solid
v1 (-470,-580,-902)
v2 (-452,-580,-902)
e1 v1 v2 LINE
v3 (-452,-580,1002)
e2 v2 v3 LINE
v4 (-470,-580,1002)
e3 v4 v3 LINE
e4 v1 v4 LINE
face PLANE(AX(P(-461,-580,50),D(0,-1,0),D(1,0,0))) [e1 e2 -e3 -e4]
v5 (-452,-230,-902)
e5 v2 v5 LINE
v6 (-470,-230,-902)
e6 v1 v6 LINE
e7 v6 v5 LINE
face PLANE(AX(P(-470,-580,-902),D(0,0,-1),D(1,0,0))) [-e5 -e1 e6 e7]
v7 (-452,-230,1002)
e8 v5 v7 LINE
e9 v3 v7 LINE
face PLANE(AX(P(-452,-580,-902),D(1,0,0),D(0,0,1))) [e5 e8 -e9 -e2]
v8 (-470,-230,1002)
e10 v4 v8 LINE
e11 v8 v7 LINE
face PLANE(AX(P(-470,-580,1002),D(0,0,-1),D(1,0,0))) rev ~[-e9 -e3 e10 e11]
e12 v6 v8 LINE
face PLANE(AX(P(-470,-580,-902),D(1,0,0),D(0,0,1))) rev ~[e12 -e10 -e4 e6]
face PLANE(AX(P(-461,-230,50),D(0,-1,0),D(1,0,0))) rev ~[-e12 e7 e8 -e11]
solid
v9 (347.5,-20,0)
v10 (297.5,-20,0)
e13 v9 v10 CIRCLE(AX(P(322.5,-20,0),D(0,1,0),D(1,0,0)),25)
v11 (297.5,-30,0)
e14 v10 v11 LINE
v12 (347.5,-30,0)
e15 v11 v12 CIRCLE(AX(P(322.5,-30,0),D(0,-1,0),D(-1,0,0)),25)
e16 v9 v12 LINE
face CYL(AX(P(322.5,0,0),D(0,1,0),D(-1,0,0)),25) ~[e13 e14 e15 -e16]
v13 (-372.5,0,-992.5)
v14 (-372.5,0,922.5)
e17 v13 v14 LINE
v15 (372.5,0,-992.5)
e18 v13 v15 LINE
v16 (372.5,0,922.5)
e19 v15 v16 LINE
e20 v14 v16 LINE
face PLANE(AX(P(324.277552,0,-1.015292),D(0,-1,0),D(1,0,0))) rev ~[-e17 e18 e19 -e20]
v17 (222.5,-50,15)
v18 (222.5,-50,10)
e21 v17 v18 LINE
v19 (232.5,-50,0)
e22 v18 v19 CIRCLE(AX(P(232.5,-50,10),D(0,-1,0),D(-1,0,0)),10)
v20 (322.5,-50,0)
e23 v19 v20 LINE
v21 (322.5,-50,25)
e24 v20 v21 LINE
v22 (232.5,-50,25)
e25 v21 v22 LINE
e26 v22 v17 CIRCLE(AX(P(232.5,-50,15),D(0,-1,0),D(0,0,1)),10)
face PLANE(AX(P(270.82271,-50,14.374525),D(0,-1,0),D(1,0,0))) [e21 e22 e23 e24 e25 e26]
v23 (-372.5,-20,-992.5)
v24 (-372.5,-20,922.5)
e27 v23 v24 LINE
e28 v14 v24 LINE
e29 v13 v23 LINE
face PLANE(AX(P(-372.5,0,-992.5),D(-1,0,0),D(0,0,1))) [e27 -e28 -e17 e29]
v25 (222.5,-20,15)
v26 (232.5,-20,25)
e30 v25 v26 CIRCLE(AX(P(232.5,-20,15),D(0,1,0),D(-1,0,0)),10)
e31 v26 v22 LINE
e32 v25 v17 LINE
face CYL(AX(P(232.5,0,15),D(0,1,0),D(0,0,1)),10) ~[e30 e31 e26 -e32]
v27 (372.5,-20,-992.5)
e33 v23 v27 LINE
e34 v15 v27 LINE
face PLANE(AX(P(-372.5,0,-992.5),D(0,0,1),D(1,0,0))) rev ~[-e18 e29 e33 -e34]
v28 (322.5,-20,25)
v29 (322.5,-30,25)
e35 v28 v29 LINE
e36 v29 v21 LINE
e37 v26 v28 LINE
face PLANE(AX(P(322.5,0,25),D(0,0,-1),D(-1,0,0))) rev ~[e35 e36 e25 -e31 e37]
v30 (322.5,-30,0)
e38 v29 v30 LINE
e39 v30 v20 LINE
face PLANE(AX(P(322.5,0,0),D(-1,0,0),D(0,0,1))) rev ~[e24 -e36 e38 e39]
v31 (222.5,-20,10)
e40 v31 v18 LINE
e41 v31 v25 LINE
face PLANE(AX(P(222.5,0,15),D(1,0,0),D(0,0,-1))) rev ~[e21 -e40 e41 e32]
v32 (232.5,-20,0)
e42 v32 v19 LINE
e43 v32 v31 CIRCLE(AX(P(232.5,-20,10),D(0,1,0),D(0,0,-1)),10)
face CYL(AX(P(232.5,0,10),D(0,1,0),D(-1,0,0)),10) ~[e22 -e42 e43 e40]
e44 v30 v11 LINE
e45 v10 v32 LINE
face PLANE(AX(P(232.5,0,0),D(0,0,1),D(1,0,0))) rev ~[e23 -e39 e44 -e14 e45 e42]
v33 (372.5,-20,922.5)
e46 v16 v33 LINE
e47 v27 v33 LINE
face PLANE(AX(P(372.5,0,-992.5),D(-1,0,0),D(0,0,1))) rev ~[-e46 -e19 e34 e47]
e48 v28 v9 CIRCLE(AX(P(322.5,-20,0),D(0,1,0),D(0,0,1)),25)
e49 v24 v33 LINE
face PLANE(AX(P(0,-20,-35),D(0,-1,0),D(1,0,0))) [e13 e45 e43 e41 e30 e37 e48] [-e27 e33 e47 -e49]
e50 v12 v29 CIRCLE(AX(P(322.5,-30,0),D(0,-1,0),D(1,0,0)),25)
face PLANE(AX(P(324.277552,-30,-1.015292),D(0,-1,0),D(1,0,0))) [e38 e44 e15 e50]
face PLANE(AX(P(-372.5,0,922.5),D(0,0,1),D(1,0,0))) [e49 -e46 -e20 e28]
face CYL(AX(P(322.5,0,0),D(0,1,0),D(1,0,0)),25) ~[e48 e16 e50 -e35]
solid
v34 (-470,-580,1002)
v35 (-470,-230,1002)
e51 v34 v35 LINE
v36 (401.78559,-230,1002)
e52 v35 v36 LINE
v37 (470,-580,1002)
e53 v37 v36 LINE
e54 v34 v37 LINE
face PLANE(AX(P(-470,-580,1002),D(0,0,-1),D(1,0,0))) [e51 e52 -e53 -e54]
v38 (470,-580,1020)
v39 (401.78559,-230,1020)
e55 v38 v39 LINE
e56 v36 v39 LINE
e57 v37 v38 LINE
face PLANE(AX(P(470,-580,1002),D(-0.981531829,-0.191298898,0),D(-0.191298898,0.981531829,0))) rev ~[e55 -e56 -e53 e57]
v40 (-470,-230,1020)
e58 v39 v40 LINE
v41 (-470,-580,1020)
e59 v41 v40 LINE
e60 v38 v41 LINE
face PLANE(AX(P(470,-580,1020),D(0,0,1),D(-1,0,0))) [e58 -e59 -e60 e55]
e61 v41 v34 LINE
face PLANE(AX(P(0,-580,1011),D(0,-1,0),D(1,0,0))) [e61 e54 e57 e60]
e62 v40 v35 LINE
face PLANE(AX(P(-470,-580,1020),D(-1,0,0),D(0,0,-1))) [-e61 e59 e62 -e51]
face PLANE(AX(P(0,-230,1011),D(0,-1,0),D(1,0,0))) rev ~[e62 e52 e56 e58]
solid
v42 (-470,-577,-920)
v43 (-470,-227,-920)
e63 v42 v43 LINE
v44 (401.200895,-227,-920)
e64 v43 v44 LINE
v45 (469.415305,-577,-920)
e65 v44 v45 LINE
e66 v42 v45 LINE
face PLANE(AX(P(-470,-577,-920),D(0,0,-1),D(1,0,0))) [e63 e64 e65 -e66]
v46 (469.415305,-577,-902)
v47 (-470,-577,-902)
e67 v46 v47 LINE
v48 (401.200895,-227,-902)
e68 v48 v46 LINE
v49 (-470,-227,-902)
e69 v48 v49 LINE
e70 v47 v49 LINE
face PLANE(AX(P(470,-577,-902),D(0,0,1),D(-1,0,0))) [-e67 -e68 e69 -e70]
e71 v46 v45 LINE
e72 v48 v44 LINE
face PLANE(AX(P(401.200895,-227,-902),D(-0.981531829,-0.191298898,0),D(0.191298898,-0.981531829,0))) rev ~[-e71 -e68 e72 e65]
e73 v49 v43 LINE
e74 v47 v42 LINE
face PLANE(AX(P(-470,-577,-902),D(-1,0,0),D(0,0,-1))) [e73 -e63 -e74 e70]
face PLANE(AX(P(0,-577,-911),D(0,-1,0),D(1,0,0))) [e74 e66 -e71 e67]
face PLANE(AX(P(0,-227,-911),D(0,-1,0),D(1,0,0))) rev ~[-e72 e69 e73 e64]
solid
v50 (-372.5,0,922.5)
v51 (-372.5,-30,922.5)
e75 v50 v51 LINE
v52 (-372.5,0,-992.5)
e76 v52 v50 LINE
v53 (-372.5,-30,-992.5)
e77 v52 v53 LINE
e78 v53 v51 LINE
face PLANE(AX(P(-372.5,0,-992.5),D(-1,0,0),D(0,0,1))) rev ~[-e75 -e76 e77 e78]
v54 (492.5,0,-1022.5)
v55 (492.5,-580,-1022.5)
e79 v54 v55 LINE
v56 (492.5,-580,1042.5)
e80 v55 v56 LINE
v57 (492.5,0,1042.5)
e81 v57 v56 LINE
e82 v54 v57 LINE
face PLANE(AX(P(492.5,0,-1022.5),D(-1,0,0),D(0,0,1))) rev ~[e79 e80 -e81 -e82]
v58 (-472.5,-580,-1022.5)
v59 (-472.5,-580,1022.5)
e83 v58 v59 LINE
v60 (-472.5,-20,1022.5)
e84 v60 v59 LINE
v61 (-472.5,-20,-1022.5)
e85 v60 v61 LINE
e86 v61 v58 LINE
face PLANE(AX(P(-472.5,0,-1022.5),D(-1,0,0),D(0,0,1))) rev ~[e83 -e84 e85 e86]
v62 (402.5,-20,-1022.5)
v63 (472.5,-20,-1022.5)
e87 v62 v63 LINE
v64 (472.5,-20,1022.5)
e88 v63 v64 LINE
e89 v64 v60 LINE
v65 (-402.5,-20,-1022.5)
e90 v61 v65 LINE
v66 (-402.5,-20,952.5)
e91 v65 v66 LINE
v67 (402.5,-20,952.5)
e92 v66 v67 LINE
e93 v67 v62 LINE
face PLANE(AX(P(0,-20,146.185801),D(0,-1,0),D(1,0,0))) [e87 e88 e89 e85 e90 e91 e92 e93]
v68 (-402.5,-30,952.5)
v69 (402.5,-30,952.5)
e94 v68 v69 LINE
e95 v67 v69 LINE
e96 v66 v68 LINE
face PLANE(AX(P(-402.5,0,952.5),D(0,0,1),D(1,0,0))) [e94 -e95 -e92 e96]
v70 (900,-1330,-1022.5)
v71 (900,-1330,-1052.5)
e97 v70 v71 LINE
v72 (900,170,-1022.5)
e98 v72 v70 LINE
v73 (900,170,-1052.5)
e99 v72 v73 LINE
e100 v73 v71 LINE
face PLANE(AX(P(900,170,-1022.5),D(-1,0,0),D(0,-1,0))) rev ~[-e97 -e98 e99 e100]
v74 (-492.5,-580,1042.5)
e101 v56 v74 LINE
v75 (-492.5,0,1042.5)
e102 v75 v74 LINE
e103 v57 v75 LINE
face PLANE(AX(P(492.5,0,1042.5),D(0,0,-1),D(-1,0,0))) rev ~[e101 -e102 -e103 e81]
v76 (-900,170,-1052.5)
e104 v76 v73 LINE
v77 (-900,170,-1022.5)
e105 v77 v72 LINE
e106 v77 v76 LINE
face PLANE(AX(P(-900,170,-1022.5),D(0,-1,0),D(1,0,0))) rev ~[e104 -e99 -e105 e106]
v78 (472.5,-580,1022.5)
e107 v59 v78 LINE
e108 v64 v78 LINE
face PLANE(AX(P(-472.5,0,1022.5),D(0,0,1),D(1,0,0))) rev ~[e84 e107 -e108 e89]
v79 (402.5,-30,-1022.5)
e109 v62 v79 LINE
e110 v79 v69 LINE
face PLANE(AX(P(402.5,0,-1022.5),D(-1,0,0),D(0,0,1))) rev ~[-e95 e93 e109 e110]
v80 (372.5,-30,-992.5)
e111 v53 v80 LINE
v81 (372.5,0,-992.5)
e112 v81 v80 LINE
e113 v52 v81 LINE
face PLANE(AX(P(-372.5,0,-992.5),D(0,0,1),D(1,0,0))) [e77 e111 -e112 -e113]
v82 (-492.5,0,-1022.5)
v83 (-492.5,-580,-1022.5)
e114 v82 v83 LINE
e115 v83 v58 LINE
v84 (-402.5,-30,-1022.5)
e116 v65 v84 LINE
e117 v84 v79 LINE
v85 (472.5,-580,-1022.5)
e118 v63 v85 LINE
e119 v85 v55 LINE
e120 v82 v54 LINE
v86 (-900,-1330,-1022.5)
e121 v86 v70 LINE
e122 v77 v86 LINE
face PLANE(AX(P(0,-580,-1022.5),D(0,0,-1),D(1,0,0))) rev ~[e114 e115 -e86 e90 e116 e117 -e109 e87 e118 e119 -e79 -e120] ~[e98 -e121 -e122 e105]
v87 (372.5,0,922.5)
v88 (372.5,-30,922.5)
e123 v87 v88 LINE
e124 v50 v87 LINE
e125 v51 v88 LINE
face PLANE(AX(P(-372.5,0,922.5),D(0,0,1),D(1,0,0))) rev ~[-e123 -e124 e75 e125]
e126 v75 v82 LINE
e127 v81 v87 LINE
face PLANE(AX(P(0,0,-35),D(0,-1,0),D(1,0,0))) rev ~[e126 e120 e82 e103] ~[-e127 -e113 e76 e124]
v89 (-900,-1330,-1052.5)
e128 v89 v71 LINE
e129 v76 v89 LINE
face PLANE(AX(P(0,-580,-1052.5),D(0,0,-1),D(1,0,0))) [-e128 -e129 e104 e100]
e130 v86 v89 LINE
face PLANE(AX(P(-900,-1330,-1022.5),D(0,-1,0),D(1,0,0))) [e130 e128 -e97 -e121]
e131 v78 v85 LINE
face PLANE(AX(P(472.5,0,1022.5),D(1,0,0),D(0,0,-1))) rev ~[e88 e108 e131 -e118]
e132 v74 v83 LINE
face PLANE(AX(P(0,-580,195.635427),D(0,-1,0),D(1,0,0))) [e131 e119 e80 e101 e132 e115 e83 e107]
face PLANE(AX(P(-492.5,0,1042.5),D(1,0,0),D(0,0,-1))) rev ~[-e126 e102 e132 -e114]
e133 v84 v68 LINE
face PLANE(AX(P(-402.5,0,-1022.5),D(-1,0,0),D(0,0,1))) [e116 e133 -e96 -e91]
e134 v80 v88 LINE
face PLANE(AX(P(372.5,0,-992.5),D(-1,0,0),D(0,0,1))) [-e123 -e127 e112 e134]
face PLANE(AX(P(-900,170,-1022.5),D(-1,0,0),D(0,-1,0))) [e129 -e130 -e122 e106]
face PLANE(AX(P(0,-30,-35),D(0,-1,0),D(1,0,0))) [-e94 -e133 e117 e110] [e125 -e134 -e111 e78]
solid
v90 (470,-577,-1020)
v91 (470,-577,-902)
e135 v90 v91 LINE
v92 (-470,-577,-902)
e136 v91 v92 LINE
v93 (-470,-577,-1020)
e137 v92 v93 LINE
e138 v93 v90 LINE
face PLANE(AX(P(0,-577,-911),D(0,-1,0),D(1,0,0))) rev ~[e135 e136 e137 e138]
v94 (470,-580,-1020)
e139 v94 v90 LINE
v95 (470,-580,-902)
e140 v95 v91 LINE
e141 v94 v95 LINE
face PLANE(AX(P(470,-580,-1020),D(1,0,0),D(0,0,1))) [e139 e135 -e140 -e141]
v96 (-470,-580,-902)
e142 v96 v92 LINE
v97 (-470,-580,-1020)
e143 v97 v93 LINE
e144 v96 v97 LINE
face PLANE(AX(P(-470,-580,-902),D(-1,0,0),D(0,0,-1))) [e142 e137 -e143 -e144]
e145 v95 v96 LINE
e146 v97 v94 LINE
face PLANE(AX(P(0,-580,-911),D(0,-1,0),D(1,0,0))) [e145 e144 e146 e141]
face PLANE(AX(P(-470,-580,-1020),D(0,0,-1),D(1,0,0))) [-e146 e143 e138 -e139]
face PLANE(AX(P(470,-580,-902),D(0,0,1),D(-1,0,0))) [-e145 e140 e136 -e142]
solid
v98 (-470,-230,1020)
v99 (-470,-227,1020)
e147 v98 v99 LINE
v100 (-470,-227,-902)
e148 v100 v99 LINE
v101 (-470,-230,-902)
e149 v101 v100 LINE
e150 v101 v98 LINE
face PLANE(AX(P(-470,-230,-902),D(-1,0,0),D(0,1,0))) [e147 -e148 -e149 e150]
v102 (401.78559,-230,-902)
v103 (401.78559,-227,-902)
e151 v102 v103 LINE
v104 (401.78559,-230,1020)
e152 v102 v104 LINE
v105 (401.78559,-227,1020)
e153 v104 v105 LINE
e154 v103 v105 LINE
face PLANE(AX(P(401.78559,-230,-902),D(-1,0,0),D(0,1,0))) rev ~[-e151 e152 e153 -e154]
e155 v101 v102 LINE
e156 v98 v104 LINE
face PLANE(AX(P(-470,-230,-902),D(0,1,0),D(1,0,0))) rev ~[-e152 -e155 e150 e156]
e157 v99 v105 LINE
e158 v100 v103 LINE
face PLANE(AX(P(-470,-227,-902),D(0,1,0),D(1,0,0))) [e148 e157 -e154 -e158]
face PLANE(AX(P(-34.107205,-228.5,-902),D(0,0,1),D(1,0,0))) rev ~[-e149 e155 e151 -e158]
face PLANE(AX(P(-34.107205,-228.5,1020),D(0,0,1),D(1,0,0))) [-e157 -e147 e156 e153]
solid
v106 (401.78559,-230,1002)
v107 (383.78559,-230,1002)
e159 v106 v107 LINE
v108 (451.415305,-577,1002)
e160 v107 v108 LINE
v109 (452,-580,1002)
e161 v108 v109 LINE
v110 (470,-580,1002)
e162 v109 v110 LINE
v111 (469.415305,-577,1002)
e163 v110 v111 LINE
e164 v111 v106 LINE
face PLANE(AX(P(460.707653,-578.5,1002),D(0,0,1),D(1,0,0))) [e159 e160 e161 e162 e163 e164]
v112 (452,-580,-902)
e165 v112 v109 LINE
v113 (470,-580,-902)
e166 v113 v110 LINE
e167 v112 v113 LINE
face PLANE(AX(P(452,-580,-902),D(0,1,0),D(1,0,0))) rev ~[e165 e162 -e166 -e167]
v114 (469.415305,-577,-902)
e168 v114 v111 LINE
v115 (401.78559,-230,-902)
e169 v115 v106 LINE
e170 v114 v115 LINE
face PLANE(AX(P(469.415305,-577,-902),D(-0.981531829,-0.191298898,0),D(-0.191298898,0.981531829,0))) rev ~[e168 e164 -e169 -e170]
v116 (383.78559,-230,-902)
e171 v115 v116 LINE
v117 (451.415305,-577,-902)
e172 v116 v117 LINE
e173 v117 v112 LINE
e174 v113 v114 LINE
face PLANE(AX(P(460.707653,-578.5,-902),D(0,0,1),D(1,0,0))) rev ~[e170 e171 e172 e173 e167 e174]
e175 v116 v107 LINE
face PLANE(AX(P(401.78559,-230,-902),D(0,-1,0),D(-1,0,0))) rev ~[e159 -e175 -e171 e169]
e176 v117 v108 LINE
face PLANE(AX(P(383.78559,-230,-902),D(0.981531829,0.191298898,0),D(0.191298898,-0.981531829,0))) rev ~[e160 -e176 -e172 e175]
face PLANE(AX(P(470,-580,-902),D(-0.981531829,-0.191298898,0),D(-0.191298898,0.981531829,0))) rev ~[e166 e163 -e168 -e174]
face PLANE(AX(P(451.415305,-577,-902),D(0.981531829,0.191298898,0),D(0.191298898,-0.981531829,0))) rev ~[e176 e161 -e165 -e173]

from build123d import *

# Parameters (mm, degrees)
F1_DEPTH  = 580
F3_DEPTH  = 20
F2_W      = 745
F2_H      = 1915
F2_W_2    = 805
F2_H_2    = 1975
F4_DEPTH  = 30
F5_DEPTH  = 30
F6_DEPTH  = 50
F7_W      = 1800
F7_H      = 1500
F8_DEPTH  = 30
F9_W      = 18
F9_H      = 1904
F10_DEPTH = 350
F11_DEPTH = 350
F12_START = -3
F12_DEPTH = 350
F13_DEPTH = 3
F15_DEPTH = 1904
F17_DEPTH = 18
F19_DEPTH = 18
F20_W     = 871.785590257
F20_H     = 3
F21_DEPTH = 1922


with BuildPart() as f1:
    # F0 (on Front) → F1 (new body)
    with BuildSketch(Plane.XZ):
        Polygon((-492.5, -1022.5), (-472.5, -1022.5), (-472.5, 1022.5), (472.5, 1022.5), (472.5, -1022.5), (492.5, -1022.5), (492.5, 1042.5), (-492.5, 1042.5), align=None)
    extrude(amount=F1_DEPTH)

    # F2 (on Front) → F3 (join)
    with BuildSketch(Plane.XZ):
        Polygon((-402.5, -1022.5), (-402.5, 952.5), (402.5, 952.5), (402.5, -1022.5), (472.5, -1022.5), (472.5, 1022.5), (-472.5, 1022.5), (-472.5, -1022.5), align=None)
    extrude(amount=F3_DEPTH)

    # F2 (on Front) → F4 (join)
    with BuildSketch(Plane.XZ):
        with Locations((0, -35)):
            Rectangle(F2_W_2, F2_H_2)
        with Locations((0, -35)):
            Rectangle(F2_W, F2_H, mode=Mode.SUBTRACT)
    extrude(amount=F4_DEPTH)

    # F7 (on face) → F8 (join)
    with BuildSketch(Plane(origin=(0, 0, -1022.5), x_dir=(1, 0, 0), z_dir=(0, 0, -1))):
        with Locations((0, 580)):
            Rectangle(F7_W, F7_H)
    extrude(amount=F8_DEPTH)


with BuildPart() as f3:
    # F2 (on Front) → F3, piece 2 (new body)
    with BuildSketch(Plane.XZ):
        with Locations((0, -35)):
            Rectangle(F2_W, F2_H)
        with BuildLine():
            ThreePointArc((322.5, 25), (340.1776695297, 17.6776695297), (347.5, 0))
            ThreePointArc((347.5, 0), (322.5, -25), (297.5, 0))
            Line((297.5, 0), (232.5, 0))
            ThreePointArc((232.5, 0), (225.4289321881, 2.9289321881), (222.5, 10))
            Line((222.5, 10), (222.5, 15))
            ThreePointArc((222.5, 15), (225.4289321881, 22.0710678119), (232.5, 25))
            Line((232.5, 25), (322.5, 25))
        make_face(mode=Mode.SUBTRACT)
    extrude(amount=F3_DEPTH)

    # F2 (on Front) → F5 (join)
    with BuildSketch(Plane.XZ):
        with BuildLine():
            ThreePointArc((297.5, 0), (322.5, -25), (347.5, 0))
            ThreePointArc((347.5, 0), (340.1776695297, 17.6776695297), (322.5, 25))
            Line((322.5, 25), (322.5, 0))
            Line((322.5, 0), (297.5, 0))
        make_face()
    extrude(amount=F5_DEPTH)

    # F2 (on Front) → F6 (join)
    with BuildSketch(Plane.XZ):
        with BuildLine():
            ThreePointArc((297.5, 0), (304.8223304703, 17.6776695297), (322.5, 25))
            Line((322.5, 25), (232.5, 25))
            ThreePointArc((232.5, 25), (225.4289321881, 22.0710678119), (222.5, 15))
            Line((222.5, 15), (222.5, 10))
            ThreePointArc((222.5, 10), (225.4289321881, 2.9289321881), (232.5, 0))
            Line((232.5, 0), (297.5, 0))
        make_face()
        with BuildLine():
            Line((322.5, 0), (322.5, 25))
            ThreePointArc((322.5, 25), (304.8223304703, 17.6776695297), (297.5, 0))
            Line((297.5, 0), (322.5, 0))
        make_face()
    extrude(amount=F6_DEPTH)


with BuildPart() as f10:
    # F9 (on face) → F10 (new body)
    with BuildSketch(Plane.XZ.offset(580)):
        with Locations((-461, 50)):
            Rectangle(F9_W, F9_H)
    extrude(amount=-F10_DEPTH)


with BuildPart() as f11:
    # F9 (on face) → F11 (new body)
    with BuildSketch(Plane.XZ.offset(580)):
        Polygon((470, 1002), (470, 1020), (-470, 1020), (-470, 1002), (-452, 1002), (452, 1002), align=None)
    extrude(amount=-F11_DEPTH)

    # F18 (on face) → F19 (cut, through all)
    with BuildSketch(Plane(origin=(0, 0, 1002), x_dir=(1, 0, 0), z_dir=(0, 0, -1))):
        Polygon((470, 230), (470, 580), (401.785590257, 230), align=None)
    extrude(amount=-F19_DEPTH, mode=Mode.SUBTRACT)


with BuildPart() as f12:
    # F9 (on face) → F12 (new body)
    with BuildSketch(Plane.XZ.offset(580).offset(F12_START)):
        Polygon((470, -920), (470, -902), (452, -902), (-452, -902), (-470, -902), (-470, -920), (-452, -920), (452, -920), align=None)
    extrude(amount=-F12_DEPTH)

    # F16 (on face) → F17 (cut, through all)
    with BuildSketch(Plane.XY.offset(-902)):
        Polygon((470, -580), (470, -227), (401.2008953163, -227), align=None)
    extrude(amount=-F17_DEPTH, mode=Mode.SUBTRACT)


with BuildPart() as f13:
    # F9 (on face) → F13 (new body)
    with BuildSketch(Plane.XZ.offset(580)):
        Polygon((470, -920), (470, -902), (452, -902), (-452, -902), (-470, -902), (-470, -920), (-452, -920), (452, -920), align=None)
        Polygon((470, -1020), (470, -920), (452, -920), (-452, -920), (-470, -920), (-470, -1020), align=None)
    extrude(amount=-F13_DEPTH)


with BuildPart() as f15:
    # F14 (on face) → F15 (new body, through all)
    with BuildSketch(Plane.XY.offset(-902)):
        Polygon((452, -580), (470, -580), (469.4153050593, -577), (451.4153050593, -577), align=None)
        Polygon((469.4153050593, -577), (401.785590257, -230), (383.785590257, -230), (451.4153050593, -577), align=None)
    extrude(amount=F15_DEPTH)


with BuildPart() as f21:
    # F20 (on face) → F21 (new body, through all)
    with BuildSketch(Plane.XY.offset(-902)):
        with Locations((-34.1072048715, -228.5)):
            Rectangle(F20_W, F20_H)
    extrude(amount=F21_DEPTH)


solid = Compound([f1.part, f3.part, f10.part, f11.part, f12.part, f13.part, f15.part, f21.part])
